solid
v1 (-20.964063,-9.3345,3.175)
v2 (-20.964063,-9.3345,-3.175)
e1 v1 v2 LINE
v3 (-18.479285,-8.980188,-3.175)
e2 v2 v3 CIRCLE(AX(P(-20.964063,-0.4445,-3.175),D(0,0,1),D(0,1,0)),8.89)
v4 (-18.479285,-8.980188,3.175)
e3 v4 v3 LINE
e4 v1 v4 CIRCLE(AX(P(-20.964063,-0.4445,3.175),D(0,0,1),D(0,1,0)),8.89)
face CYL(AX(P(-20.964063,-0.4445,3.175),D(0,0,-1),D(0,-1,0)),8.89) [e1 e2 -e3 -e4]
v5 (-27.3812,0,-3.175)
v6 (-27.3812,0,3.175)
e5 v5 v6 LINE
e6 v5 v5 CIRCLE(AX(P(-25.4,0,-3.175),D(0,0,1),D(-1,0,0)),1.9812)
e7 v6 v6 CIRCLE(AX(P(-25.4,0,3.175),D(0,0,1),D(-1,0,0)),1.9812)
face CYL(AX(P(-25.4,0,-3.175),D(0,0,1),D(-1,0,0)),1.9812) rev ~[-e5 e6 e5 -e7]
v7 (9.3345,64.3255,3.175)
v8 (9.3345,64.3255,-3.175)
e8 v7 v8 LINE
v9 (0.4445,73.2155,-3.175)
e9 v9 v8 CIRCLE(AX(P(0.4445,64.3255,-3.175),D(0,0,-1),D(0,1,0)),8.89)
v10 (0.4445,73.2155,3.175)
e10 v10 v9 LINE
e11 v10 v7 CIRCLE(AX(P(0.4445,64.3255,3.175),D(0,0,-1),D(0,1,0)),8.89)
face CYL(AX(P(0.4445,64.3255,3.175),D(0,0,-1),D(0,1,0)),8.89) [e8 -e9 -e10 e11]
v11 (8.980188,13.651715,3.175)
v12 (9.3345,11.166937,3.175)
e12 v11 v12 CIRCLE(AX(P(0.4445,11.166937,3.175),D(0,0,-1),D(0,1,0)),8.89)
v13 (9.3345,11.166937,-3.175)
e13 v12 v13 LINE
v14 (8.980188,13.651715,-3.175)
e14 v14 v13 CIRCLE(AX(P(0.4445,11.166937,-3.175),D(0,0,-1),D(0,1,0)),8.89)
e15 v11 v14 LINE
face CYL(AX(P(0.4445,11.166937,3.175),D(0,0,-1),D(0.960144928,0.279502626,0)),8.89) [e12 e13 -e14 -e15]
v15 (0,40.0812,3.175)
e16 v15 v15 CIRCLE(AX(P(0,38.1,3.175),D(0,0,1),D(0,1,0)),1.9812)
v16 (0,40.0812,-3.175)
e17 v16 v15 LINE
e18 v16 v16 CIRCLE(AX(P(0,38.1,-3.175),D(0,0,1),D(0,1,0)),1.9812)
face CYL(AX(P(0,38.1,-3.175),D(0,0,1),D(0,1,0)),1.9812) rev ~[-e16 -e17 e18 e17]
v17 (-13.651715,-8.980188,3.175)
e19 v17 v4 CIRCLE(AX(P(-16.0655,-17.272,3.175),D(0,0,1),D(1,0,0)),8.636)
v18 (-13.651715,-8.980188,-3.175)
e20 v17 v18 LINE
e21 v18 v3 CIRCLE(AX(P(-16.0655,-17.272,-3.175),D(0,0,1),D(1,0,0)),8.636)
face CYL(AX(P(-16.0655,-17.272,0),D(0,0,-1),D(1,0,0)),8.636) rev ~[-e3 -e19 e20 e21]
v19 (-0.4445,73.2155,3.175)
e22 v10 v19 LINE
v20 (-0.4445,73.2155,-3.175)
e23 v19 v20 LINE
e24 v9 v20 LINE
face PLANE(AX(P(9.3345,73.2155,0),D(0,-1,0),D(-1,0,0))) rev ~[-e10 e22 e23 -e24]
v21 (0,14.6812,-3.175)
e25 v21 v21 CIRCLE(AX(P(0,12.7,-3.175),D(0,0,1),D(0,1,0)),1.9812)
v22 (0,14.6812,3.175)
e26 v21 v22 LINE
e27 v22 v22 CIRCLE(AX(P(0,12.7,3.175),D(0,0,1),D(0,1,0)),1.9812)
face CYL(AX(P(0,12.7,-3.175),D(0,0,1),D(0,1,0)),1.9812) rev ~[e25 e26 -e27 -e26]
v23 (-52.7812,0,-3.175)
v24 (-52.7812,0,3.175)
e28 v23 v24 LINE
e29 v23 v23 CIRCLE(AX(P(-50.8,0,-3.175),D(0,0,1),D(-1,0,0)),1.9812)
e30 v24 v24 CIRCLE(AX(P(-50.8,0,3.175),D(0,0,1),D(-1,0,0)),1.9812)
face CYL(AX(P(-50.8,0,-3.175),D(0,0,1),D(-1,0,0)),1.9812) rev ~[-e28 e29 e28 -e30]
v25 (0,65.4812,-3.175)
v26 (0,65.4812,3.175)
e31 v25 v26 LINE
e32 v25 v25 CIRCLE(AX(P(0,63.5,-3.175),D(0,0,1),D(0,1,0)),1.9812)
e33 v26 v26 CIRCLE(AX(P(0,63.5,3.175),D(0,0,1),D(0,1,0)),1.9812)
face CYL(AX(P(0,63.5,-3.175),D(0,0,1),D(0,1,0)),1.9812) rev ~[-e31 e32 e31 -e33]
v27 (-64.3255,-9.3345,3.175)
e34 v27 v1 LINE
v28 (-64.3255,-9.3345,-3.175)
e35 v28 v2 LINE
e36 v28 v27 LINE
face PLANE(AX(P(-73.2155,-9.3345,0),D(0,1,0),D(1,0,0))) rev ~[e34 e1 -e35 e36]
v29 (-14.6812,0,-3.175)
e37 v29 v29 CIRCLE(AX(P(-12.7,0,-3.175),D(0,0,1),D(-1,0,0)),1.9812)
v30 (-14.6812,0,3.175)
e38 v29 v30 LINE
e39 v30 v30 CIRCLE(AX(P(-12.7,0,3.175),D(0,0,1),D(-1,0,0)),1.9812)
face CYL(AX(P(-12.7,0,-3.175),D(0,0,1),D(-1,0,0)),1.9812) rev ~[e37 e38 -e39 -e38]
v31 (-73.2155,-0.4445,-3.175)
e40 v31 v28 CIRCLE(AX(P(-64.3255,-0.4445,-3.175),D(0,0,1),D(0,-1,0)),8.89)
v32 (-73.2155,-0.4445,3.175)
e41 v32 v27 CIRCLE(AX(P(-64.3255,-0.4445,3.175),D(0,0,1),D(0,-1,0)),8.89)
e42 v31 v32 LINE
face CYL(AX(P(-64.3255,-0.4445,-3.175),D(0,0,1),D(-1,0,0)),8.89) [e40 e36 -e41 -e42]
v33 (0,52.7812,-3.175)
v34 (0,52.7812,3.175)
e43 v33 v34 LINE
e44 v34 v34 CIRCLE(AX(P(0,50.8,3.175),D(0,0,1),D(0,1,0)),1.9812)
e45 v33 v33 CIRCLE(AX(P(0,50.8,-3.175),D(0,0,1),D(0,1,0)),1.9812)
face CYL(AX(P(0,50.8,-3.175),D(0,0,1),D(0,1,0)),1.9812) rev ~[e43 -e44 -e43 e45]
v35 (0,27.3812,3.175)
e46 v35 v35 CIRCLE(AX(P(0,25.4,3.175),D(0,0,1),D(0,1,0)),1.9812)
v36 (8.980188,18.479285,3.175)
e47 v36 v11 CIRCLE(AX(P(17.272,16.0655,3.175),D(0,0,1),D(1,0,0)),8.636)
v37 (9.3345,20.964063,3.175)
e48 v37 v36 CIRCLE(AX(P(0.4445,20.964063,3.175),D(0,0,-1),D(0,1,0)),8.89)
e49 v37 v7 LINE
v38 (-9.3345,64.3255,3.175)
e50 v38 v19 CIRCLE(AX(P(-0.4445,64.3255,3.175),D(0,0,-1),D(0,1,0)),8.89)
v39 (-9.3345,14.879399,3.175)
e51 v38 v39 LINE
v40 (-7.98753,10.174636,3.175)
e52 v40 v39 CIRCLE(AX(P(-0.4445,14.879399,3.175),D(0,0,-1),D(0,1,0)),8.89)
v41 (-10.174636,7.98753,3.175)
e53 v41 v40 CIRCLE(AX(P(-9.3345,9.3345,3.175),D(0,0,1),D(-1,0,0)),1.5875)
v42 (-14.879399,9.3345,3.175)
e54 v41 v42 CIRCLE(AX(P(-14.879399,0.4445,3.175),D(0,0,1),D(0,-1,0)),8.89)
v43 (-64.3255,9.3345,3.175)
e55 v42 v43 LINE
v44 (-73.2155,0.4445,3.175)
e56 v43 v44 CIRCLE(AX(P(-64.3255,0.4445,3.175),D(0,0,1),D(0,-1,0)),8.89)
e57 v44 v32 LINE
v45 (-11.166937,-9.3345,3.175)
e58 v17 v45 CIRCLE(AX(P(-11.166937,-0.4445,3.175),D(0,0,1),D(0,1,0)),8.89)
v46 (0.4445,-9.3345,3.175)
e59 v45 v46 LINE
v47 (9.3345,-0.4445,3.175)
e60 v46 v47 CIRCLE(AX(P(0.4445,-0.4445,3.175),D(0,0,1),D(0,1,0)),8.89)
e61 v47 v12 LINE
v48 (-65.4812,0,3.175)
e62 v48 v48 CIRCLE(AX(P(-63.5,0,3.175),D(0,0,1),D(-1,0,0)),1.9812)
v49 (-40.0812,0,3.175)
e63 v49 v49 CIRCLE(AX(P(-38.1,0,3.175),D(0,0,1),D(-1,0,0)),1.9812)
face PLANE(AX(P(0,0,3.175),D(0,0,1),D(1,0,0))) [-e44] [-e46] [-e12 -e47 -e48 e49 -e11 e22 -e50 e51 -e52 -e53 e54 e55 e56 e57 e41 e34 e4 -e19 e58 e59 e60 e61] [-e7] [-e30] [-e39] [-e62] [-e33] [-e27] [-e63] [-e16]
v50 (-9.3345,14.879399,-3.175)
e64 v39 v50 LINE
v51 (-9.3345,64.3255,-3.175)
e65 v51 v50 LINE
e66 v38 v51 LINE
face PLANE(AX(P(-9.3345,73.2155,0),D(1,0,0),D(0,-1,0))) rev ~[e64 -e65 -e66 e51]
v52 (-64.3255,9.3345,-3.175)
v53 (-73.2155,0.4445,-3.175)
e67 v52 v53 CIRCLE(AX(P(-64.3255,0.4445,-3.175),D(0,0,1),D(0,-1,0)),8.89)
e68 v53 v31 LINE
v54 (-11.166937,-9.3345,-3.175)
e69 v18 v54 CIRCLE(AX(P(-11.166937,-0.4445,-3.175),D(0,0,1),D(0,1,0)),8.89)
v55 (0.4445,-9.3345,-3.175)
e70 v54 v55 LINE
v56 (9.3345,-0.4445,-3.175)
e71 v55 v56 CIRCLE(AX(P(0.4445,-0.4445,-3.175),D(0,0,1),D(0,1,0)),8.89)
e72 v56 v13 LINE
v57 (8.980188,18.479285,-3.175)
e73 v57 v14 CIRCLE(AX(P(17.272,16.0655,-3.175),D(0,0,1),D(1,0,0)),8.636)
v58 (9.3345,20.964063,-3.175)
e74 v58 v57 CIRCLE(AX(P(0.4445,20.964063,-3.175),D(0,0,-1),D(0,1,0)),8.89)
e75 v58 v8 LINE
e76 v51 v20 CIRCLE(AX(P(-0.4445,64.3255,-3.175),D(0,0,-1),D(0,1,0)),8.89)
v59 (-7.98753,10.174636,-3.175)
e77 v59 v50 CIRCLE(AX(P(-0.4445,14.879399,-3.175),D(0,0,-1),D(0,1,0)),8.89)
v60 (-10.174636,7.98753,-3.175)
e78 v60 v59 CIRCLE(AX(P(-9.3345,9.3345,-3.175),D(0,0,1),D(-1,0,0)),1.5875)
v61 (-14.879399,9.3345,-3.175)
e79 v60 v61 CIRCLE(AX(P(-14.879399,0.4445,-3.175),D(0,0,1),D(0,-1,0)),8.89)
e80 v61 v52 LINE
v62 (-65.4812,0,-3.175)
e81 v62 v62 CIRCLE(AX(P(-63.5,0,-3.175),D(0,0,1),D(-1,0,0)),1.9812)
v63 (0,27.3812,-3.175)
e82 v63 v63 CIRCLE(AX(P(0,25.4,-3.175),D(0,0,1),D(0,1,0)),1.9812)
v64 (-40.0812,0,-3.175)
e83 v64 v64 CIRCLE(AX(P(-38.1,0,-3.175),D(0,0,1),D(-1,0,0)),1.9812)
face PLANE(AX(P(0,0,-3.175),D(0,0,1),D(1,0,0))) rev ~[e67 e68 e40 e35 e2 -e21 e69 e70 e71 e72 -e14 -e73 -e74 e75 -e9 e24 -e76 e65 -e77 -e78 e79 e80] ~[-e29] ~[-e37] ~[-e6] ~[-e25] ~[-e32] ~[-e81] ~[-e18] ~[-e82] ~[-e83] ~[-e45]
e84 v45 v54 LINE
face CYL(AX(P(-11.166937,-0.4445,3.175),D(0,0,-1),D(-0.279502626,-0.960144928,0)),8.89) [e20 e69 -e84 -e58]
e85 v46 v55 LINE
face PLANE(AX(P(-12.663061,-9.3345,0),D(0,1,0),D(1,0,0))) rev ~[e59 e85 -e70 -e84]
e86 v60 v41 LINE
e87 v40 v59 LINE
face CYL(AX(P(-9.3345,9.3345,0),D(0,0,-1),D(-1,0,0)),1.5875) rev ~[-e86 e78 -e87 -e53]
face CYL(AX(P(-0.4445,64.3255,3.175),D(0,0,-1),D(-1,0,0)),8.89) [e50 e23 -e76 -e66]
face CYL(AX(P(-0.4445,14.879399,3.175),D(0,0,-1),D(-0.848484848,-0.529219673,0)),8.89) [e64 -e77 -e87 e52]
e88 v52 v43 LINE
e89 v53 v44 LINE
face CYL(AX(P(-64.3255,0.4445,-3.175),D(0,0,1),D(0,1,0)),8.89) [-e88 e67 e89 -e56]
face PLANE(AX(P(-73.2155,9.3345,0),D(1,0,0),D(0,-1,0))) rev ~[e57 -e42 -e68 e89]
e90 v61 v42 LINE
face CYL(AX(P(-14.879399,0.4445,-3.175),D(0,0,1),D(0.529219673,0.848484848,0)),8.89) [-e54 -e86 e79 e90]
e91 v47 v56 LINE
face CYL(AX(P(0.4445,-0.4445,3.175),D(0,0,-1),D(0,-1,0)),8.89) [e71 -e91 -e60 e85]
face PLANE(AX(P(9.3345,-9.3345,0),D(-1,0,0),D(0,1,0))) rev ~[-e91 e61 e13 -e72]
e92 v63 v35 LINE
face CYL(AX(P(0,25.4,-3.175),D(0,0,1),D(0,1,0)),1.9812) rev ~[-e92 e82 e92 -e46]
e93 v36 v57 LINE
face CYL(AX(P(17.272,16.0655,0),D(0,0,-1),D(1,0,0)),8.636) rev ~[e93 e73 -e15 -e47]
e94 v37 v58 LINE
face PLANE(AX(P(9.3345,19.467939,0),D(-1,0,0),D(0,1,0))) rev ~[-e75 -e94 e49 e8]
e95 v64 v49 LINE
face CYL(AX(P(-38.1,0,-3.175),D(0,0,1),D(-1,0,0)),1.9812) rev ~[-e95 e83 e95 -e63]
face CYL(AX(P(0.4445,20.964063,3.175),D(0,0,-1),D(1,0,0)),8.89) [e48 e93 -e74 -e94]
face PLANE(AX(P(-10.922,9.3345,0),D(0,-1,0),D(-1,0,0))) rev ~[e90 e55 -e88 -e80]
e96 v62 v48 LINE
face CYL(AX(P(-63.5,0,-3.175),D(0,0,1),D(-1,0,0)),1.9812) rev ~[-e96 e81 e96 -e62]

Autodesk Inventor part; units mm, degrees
ref_plane "YZ Plane" through (0, 0, 0) normal (1, 0, 0) x (0, 1, 0)
ref_plane "XZ Plane" through (0, 0, 0) normal (0, 1, 0) x (-1, 0, 0)
ref_plane "XY Plane" through (0, 0, 0) normal (0, 0, 1) x (1, 0, 0)
sketch "Sketch1" plane through (0, 0, 0) normal (0, 0, 1) x (1, 0, 0)
  line L0 (-9.3345, 9.3345) -> (-73.2155, 9.3345)
  line L1 (-73.2155, 9.3345) -> (-73.2155, -9.3345)
  line L2 (-73.2155, -9.3345) -> (9.3345, -9.3345)
  line L3 (9.3345, -9.3345) -> (9.3345, 73.2155)
  line L4 (9.3345, 73.2155) -> (-9.3345, 73.2155)
  line L5 (0, 73.2155) -> (0, 0) construction
  line L6 (0, 0) -> (-73.2155, 0) construction
  line L7 (-9.3345, 73.2155) -> (-9.3345, 9.3345)
  line L8 (-12.7, 12.7) -> (-76.581, 12.7) construction
  line L9 (-76.581, 12.7) -> (-76.581, -12.7) construction
  line L10 (-76.581, -12.7) -> (12.7, -12.7) construction
  line L11 (12.7, -12.7) -> (12.7, 76.581) construction
  line L12 (12.7, 76.581) -> (-12.7, 76.581) construction
  line L13 (-12.7, 76.581) -> (-12.7, 12.7) construction
  line L14 (9.3345, -9.3345) -> (-9.3345, 9.3345) construction
  arc A0 (-10.922, 9.3345) -> (-9.3345, 10.922) centre (-9.3345, 9.3345) ccw
  circle A1 centre (17.272, 16.0655) radius 8.636
  circle A2 centre (-16.0655, -17.272) radius 8.636
  point P0 (9.3345, 12.6631)
  point P1 (9.3345, 19.4679)
  point P2 (-19.4679, -9.3345)
  point P3 (-12.6631, -9.3345)
  dimension "d1" = 18.669
  dimension "d2" = 82.55
  dimension "d14" = 25.4
  dimension "d48" = 1.5875
  dimension "d57" = 7.9375
  dimension "d58" = 17.272
  dimension "d59" = 25.4
extrude "Plate1" add sketch "Sketch1" along normal mid plane 6.35 contours A0 L7 L4 L3 A1 L2 A2 L1 L0
sketch "Sketch3" plane through (0, 0, -3.175) normal (0, 0, -1) x (-1, 0, 0)
  line L0 (0, 0) -> (0, 73.2155) construction
  line L1 (-9.3345, 73.2155) -> (9.3345, 73.2155) construction
  line L2 (73.2155, -9.3345) -> (-9.3345, -9.3345) construction
  point P0 (0, 12.7)
  point P1 (0, 25.4)
  point P2 (0, 38.1)
  point P3 (0, 50.8)
  point P4 (0, 63.5)
  dimension "d33" = 22.0345
  dimension "d36" = 12.7
hole "Hole3" at (0, 12.7, -3.175) at (0, 25.4, -3.175) at (0, 38.1, -3.175) at (0, 50.8, -3.175) at (0, 63.5, -3.175) direction (0, 0, 1) diameter 3.9624 end through all thread size "10-32 UNF" class "2B" standard "ANSI Unified Screw Threads"
pattern_circular "Circular Pattern1" count 2 over 90 about axis through (0, 0, -10) along (0, 0, 1) of "Hole3"
fillet "Corner Round1" radius 8.89 11 edges at (-9.3345, 73.2155, 0) (9.3345, 73.2155, 0) (-9.3345, 10.922, 0) (9.3345, -9.3345, 0) (-73.2155, 9.3345, 0) (-73.2155, -9.3345, 0) (-10.922, 9.3345, 0) (-19.4679, -9.3345, 0) (-12.6631, -9.3345, 0) (9.3345, 19.4679, 0) (9.3345, 12.6631, 0)
equation "\"d32\" = Thickness"
equation "\"BendRadius\" = Thickness"
equation "\"BendReliefWidth\" = Thickness"
equation "\"BendReliefDepth\" = 0.5 * Thickness"
equation "\"CornerReliefSize\" = 4 * Thickness"
equation "\"MinimumRemnant\" = 2 * Thickness"
equation "\"TransitionRadius\" = BendRadius"
equation "\"JacobiRadiusSize\" = BendRadius"
equation "\"GapSize\" = Thickness"
equation "\"Thickness\" = 6.35"
properties part number "PLATE,BRACKET,ELEVATOR,STAGE1" material "Aluminum 7075"
